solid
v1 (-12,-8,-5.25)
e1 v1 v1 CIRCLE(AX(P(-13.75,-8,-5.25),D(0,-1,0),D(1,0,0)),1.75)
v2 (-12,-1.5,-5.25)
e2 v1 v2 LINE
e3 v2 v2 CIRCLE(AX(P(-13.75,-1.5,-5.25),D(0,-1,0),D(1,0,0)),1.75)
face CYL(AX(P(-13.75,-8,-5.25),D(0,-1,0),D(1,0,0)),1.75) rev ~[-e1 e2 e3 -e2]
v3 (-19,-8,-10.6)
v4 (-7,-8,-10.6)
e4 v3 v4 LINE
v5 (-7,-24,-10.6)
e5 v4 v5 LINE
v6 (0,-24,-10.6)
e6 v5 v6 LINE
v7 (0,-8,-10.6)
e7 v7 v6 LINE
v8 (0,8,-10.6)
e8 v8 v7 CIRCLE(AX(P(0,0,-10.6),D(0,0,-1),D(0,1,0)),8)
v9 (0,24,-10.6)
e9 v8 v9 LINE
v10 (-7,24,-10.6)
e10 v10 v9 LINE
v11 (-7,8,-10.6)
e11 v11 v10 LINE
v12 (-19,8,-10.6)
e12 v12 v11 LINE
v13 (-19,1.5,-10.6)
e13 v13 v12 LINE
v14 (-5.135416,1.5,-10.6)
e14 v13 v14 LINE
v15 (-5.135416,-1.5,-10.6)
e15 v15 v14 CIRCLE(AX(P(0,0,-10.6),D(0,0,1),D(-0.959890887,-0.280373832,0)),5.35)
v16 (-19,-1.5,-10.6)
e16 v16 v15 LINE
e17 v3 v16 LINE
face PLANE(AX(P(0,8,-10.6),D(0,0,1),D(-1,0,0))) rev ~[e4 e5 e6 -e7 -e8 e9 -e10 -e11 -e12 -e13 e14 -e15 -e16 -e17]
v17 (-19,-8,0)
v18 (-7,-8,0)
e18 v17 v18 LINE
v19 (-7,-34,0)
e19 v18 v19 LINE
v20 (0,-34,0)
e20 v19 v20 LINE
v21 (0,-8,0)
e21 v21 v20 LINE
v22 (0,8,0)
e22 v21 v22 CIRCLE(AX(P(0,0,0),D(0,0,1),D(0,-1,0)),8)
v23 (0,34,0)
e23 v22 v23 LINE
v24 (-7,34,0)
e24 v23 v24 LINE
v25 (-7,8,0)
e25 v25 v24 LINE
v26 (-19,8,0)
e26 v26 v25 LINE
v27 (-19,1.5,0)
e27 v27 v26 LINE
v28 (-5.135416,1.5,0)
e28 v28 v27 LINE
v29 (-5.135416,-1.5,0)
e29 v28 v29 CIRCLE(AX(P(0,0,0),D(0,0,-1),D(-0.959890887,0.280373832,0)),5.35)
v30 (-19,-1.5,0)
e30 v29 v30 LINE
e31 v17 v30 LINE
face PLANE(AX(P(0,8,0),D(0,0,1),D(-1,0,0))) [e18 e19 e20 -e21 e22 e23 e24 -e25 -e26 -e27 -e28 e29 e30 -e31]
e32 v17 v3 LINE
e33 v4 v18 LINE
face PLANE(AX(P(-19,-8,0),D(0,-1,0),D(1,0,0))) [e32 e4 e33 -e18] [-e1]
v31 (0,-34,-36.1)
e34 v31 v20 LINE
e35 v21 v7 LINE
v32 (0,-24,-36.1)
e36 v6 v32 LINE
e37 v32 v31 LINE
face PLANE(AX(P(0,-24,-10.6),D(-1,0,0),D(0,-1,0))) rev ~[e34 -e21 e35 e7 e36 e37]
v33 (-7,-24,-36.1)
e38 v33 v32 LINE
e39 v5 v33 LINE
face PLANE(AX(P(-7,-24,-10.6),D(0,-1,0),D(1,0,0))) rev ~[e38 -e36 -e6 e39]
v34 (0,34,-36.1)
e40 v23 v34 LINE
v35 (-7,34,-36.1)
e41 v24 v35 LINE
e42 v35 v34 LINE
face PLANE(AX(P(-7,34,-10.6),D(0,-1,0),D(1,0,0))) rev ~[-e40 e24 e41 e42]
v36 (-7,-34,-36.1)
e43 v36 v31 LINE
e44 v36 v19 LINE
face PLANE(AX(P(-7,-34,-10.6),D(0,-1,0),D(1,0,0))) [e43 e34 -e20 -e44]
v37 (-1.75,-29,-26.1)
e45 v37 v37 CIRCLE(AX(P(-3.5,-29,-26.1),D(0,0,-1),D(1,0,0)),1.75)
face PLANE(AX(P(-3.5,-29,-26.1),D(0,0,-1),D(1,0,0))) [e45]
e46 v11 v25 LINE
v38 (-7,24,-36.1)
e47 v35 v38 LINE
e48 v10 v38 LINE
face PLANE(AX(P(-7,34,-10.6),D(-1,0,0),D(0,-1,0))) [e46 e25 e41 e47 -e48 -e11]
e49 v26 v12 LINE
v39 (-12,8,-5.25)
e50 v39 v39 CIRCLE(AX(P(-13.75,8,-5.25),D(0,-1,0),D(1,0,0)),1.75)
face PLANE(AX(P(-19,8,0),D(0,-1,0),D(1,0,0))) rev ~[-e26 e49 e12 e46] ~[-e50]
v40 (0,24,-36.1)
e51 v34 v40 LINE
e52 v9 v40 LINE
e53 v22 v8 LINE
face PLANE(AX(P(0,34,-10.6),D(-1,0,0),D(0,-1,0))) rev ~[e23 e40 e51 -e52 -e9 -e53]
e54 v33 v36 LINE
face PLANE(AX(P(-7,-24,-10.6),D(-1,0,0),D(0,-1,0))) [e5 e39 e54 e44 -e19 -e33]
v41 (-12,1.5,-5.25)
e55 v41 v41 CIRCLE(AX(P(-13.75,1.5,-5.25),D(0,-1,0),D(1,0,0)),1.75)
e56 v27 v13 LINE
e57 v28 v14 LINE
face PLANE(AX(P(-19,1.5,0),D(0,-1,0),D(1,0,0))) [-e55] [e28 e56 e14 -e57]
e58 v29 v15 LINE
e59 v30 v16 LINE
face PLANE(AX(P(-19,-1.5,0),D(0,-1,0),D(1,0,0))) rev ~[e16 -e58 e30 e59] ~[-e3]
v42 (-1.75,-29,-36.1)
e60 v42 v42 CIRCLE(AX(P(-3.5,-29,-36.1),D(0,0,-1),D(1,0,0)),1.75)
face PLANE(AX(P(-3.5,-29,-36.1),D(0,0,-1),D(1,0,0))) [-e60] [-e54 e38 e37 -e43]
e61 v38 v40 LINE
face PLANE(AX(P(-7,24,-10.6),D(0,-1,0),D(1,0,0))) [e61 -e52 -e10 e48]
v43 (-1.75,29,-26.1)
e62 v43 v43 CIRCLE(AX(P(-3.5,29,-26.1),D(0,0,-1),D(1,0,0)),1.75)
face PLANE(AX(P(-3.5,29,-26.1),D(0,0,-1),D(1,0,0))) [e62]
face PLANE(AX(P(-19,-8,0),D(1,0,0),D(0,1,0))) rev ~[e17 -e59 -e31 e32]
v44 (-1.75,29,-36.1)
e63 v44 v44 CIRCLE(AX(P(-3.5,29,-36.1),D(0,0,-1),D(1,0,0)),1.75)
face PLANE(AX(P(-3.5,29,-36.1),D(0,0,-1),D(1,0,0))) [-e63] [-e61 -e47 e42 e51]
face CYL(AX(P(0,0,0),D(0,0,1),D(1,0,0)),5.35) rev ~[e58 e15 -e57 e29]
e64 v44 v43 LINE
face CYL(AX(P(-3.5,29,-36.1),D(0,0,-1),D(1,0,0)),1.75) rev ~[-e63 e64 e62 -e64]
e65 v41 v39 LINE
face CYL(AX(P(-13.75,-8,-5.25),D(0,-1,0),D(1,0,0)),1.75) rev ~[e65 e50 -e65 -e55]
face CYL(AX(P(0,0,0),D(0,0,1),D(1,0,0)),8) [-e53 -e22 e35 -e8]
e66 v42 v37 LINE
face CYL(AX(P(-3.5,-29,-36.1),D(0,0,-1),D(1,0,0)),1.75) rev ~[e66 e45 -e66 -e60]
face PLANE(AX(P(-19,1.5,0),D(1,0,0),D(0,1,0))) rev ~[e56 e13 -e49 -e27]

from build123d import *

# Parameters (mm, degrees)
F0_R      = 8
F1_DEPTH  = 10.6
F2_W      = 19
F2_H      = 6.5
F3_DEPTH  = 10.6
F4_R      = 5.35
F5_DEPTH  = 10.601
F6_W      = 5.4454011573
F6_H      = 3
F7_DEPTH  = 10.601
F8_R      = 1.75
F9_DEPTH  = 16.001
F10_W     = 7
F10_H     = 10.6
F11_DEPTH = 26
F12_W     = 7
F12_H     = 10
F13_DEPTH = 25.5
F14_W     = 7
F14_H     = 10.6
F15_DEPTH = 26
F16_W     = 7
F16_H     = 10
F17_DEPTH = 25.5
F18_R     = 1.75
F19_DEPTH = 10


with BuildPart() as f1:
    # F0 (on Top) → F1 (new body)
    with BuildSketch(Plane.XY):
        Circle(F0_R)
    extrude(amount=-F1_DEPTH)

    # F2 (on face) → F3 (join, through all)
    with BuildSketch(Plane.XY):
        with Locations((-9.5, 4.75)):
            Rectangle(F2_W, F2_H)
        with Locations((-9.5, -4.75)):
            Rectangle(F2_W, F2_H)
    extrude(amount=-F3_DEPTH)

    # F4 (on face) → F5 (cut, through all)
    with BuildSketch(Plane.XY):
        Circle(F4_R)
    extrude(amount=-F5_DEPTH, mode=Mode.SUBTRACT)

    # F6 (on face) → F7 (cut, through all)
    with BuildSketch(Plane.XY):
        with Locations((-7.8581168228, 0)):
            Rectangle(F6_W, F6_H)
    extrude(amount=-F7_DEPTH, mode=Mode.SUBTRACT)

    # F8 (on face) → F9 (cut, through all)
    with BuildSketch(Plane.XZ.offset(8)):
        with Locations((-13.75, -5.25)):
            Circle(F8_R)
    extrude(amount=-F9_DEPTH, mode=Mode.SUBTRACT)

    # F10 (on face) → F11 (join)
    with BuildSketch(Plane.XZ.offset(8)):
        with Locations((-3.5, -5.3)):
            Rectangle(F10_W, F10_H)
    extrude(amount=F11_DEPTH)

    # F12 (on face) → F13 (join)
    with BuildSketch(Plane(origin=(0, 0, -10.6), x_dir=(1, 0, 0), z_dir=(0, 0, -1))):
        with Locations((-3.5, 29)):
            Rectangle(F12_W, F12_H)
    extrude(amount=F13_DEPTH)

    # F14 (on face) → F15 (join)
    with BuildSketch(Plane(origin=(0, 8, 0), x_dir=(-1, 0, 0), z_dir=(0, 1, 0))):
        with Locations((3.5, -5.3)):
            Rectangle(F14_W, F14_H)
    extrude(amount=F15_DEPTH)

    # F16 (on face) → F17 (join)
    with BuildSketch(Plane(origin=(0, 0, -10.6), x_dir=(1, 0, 0), z_dir=(0, 0, -1))):
        with Locations((-3.5, -29)):
            Rectangle(F16_W, F16_H)
    extrude(amount=F17_DEPTH)

    # F18 (on face) → F19 (cut)
    with BuildSketch(Plane(origin=(0, 0, -36.1), x_dir=(1, 0, 0), z_dir=(0, 0, -1))):
        with Locations((-3.5, 29)):
            Circle(F18_R)
        with Locations((-3.5, -29)):
            Circle(F18_R)
    extrude(amount=-F19_DEPTH, mode=Mode.SUBTRACT)


solid = f1.part
